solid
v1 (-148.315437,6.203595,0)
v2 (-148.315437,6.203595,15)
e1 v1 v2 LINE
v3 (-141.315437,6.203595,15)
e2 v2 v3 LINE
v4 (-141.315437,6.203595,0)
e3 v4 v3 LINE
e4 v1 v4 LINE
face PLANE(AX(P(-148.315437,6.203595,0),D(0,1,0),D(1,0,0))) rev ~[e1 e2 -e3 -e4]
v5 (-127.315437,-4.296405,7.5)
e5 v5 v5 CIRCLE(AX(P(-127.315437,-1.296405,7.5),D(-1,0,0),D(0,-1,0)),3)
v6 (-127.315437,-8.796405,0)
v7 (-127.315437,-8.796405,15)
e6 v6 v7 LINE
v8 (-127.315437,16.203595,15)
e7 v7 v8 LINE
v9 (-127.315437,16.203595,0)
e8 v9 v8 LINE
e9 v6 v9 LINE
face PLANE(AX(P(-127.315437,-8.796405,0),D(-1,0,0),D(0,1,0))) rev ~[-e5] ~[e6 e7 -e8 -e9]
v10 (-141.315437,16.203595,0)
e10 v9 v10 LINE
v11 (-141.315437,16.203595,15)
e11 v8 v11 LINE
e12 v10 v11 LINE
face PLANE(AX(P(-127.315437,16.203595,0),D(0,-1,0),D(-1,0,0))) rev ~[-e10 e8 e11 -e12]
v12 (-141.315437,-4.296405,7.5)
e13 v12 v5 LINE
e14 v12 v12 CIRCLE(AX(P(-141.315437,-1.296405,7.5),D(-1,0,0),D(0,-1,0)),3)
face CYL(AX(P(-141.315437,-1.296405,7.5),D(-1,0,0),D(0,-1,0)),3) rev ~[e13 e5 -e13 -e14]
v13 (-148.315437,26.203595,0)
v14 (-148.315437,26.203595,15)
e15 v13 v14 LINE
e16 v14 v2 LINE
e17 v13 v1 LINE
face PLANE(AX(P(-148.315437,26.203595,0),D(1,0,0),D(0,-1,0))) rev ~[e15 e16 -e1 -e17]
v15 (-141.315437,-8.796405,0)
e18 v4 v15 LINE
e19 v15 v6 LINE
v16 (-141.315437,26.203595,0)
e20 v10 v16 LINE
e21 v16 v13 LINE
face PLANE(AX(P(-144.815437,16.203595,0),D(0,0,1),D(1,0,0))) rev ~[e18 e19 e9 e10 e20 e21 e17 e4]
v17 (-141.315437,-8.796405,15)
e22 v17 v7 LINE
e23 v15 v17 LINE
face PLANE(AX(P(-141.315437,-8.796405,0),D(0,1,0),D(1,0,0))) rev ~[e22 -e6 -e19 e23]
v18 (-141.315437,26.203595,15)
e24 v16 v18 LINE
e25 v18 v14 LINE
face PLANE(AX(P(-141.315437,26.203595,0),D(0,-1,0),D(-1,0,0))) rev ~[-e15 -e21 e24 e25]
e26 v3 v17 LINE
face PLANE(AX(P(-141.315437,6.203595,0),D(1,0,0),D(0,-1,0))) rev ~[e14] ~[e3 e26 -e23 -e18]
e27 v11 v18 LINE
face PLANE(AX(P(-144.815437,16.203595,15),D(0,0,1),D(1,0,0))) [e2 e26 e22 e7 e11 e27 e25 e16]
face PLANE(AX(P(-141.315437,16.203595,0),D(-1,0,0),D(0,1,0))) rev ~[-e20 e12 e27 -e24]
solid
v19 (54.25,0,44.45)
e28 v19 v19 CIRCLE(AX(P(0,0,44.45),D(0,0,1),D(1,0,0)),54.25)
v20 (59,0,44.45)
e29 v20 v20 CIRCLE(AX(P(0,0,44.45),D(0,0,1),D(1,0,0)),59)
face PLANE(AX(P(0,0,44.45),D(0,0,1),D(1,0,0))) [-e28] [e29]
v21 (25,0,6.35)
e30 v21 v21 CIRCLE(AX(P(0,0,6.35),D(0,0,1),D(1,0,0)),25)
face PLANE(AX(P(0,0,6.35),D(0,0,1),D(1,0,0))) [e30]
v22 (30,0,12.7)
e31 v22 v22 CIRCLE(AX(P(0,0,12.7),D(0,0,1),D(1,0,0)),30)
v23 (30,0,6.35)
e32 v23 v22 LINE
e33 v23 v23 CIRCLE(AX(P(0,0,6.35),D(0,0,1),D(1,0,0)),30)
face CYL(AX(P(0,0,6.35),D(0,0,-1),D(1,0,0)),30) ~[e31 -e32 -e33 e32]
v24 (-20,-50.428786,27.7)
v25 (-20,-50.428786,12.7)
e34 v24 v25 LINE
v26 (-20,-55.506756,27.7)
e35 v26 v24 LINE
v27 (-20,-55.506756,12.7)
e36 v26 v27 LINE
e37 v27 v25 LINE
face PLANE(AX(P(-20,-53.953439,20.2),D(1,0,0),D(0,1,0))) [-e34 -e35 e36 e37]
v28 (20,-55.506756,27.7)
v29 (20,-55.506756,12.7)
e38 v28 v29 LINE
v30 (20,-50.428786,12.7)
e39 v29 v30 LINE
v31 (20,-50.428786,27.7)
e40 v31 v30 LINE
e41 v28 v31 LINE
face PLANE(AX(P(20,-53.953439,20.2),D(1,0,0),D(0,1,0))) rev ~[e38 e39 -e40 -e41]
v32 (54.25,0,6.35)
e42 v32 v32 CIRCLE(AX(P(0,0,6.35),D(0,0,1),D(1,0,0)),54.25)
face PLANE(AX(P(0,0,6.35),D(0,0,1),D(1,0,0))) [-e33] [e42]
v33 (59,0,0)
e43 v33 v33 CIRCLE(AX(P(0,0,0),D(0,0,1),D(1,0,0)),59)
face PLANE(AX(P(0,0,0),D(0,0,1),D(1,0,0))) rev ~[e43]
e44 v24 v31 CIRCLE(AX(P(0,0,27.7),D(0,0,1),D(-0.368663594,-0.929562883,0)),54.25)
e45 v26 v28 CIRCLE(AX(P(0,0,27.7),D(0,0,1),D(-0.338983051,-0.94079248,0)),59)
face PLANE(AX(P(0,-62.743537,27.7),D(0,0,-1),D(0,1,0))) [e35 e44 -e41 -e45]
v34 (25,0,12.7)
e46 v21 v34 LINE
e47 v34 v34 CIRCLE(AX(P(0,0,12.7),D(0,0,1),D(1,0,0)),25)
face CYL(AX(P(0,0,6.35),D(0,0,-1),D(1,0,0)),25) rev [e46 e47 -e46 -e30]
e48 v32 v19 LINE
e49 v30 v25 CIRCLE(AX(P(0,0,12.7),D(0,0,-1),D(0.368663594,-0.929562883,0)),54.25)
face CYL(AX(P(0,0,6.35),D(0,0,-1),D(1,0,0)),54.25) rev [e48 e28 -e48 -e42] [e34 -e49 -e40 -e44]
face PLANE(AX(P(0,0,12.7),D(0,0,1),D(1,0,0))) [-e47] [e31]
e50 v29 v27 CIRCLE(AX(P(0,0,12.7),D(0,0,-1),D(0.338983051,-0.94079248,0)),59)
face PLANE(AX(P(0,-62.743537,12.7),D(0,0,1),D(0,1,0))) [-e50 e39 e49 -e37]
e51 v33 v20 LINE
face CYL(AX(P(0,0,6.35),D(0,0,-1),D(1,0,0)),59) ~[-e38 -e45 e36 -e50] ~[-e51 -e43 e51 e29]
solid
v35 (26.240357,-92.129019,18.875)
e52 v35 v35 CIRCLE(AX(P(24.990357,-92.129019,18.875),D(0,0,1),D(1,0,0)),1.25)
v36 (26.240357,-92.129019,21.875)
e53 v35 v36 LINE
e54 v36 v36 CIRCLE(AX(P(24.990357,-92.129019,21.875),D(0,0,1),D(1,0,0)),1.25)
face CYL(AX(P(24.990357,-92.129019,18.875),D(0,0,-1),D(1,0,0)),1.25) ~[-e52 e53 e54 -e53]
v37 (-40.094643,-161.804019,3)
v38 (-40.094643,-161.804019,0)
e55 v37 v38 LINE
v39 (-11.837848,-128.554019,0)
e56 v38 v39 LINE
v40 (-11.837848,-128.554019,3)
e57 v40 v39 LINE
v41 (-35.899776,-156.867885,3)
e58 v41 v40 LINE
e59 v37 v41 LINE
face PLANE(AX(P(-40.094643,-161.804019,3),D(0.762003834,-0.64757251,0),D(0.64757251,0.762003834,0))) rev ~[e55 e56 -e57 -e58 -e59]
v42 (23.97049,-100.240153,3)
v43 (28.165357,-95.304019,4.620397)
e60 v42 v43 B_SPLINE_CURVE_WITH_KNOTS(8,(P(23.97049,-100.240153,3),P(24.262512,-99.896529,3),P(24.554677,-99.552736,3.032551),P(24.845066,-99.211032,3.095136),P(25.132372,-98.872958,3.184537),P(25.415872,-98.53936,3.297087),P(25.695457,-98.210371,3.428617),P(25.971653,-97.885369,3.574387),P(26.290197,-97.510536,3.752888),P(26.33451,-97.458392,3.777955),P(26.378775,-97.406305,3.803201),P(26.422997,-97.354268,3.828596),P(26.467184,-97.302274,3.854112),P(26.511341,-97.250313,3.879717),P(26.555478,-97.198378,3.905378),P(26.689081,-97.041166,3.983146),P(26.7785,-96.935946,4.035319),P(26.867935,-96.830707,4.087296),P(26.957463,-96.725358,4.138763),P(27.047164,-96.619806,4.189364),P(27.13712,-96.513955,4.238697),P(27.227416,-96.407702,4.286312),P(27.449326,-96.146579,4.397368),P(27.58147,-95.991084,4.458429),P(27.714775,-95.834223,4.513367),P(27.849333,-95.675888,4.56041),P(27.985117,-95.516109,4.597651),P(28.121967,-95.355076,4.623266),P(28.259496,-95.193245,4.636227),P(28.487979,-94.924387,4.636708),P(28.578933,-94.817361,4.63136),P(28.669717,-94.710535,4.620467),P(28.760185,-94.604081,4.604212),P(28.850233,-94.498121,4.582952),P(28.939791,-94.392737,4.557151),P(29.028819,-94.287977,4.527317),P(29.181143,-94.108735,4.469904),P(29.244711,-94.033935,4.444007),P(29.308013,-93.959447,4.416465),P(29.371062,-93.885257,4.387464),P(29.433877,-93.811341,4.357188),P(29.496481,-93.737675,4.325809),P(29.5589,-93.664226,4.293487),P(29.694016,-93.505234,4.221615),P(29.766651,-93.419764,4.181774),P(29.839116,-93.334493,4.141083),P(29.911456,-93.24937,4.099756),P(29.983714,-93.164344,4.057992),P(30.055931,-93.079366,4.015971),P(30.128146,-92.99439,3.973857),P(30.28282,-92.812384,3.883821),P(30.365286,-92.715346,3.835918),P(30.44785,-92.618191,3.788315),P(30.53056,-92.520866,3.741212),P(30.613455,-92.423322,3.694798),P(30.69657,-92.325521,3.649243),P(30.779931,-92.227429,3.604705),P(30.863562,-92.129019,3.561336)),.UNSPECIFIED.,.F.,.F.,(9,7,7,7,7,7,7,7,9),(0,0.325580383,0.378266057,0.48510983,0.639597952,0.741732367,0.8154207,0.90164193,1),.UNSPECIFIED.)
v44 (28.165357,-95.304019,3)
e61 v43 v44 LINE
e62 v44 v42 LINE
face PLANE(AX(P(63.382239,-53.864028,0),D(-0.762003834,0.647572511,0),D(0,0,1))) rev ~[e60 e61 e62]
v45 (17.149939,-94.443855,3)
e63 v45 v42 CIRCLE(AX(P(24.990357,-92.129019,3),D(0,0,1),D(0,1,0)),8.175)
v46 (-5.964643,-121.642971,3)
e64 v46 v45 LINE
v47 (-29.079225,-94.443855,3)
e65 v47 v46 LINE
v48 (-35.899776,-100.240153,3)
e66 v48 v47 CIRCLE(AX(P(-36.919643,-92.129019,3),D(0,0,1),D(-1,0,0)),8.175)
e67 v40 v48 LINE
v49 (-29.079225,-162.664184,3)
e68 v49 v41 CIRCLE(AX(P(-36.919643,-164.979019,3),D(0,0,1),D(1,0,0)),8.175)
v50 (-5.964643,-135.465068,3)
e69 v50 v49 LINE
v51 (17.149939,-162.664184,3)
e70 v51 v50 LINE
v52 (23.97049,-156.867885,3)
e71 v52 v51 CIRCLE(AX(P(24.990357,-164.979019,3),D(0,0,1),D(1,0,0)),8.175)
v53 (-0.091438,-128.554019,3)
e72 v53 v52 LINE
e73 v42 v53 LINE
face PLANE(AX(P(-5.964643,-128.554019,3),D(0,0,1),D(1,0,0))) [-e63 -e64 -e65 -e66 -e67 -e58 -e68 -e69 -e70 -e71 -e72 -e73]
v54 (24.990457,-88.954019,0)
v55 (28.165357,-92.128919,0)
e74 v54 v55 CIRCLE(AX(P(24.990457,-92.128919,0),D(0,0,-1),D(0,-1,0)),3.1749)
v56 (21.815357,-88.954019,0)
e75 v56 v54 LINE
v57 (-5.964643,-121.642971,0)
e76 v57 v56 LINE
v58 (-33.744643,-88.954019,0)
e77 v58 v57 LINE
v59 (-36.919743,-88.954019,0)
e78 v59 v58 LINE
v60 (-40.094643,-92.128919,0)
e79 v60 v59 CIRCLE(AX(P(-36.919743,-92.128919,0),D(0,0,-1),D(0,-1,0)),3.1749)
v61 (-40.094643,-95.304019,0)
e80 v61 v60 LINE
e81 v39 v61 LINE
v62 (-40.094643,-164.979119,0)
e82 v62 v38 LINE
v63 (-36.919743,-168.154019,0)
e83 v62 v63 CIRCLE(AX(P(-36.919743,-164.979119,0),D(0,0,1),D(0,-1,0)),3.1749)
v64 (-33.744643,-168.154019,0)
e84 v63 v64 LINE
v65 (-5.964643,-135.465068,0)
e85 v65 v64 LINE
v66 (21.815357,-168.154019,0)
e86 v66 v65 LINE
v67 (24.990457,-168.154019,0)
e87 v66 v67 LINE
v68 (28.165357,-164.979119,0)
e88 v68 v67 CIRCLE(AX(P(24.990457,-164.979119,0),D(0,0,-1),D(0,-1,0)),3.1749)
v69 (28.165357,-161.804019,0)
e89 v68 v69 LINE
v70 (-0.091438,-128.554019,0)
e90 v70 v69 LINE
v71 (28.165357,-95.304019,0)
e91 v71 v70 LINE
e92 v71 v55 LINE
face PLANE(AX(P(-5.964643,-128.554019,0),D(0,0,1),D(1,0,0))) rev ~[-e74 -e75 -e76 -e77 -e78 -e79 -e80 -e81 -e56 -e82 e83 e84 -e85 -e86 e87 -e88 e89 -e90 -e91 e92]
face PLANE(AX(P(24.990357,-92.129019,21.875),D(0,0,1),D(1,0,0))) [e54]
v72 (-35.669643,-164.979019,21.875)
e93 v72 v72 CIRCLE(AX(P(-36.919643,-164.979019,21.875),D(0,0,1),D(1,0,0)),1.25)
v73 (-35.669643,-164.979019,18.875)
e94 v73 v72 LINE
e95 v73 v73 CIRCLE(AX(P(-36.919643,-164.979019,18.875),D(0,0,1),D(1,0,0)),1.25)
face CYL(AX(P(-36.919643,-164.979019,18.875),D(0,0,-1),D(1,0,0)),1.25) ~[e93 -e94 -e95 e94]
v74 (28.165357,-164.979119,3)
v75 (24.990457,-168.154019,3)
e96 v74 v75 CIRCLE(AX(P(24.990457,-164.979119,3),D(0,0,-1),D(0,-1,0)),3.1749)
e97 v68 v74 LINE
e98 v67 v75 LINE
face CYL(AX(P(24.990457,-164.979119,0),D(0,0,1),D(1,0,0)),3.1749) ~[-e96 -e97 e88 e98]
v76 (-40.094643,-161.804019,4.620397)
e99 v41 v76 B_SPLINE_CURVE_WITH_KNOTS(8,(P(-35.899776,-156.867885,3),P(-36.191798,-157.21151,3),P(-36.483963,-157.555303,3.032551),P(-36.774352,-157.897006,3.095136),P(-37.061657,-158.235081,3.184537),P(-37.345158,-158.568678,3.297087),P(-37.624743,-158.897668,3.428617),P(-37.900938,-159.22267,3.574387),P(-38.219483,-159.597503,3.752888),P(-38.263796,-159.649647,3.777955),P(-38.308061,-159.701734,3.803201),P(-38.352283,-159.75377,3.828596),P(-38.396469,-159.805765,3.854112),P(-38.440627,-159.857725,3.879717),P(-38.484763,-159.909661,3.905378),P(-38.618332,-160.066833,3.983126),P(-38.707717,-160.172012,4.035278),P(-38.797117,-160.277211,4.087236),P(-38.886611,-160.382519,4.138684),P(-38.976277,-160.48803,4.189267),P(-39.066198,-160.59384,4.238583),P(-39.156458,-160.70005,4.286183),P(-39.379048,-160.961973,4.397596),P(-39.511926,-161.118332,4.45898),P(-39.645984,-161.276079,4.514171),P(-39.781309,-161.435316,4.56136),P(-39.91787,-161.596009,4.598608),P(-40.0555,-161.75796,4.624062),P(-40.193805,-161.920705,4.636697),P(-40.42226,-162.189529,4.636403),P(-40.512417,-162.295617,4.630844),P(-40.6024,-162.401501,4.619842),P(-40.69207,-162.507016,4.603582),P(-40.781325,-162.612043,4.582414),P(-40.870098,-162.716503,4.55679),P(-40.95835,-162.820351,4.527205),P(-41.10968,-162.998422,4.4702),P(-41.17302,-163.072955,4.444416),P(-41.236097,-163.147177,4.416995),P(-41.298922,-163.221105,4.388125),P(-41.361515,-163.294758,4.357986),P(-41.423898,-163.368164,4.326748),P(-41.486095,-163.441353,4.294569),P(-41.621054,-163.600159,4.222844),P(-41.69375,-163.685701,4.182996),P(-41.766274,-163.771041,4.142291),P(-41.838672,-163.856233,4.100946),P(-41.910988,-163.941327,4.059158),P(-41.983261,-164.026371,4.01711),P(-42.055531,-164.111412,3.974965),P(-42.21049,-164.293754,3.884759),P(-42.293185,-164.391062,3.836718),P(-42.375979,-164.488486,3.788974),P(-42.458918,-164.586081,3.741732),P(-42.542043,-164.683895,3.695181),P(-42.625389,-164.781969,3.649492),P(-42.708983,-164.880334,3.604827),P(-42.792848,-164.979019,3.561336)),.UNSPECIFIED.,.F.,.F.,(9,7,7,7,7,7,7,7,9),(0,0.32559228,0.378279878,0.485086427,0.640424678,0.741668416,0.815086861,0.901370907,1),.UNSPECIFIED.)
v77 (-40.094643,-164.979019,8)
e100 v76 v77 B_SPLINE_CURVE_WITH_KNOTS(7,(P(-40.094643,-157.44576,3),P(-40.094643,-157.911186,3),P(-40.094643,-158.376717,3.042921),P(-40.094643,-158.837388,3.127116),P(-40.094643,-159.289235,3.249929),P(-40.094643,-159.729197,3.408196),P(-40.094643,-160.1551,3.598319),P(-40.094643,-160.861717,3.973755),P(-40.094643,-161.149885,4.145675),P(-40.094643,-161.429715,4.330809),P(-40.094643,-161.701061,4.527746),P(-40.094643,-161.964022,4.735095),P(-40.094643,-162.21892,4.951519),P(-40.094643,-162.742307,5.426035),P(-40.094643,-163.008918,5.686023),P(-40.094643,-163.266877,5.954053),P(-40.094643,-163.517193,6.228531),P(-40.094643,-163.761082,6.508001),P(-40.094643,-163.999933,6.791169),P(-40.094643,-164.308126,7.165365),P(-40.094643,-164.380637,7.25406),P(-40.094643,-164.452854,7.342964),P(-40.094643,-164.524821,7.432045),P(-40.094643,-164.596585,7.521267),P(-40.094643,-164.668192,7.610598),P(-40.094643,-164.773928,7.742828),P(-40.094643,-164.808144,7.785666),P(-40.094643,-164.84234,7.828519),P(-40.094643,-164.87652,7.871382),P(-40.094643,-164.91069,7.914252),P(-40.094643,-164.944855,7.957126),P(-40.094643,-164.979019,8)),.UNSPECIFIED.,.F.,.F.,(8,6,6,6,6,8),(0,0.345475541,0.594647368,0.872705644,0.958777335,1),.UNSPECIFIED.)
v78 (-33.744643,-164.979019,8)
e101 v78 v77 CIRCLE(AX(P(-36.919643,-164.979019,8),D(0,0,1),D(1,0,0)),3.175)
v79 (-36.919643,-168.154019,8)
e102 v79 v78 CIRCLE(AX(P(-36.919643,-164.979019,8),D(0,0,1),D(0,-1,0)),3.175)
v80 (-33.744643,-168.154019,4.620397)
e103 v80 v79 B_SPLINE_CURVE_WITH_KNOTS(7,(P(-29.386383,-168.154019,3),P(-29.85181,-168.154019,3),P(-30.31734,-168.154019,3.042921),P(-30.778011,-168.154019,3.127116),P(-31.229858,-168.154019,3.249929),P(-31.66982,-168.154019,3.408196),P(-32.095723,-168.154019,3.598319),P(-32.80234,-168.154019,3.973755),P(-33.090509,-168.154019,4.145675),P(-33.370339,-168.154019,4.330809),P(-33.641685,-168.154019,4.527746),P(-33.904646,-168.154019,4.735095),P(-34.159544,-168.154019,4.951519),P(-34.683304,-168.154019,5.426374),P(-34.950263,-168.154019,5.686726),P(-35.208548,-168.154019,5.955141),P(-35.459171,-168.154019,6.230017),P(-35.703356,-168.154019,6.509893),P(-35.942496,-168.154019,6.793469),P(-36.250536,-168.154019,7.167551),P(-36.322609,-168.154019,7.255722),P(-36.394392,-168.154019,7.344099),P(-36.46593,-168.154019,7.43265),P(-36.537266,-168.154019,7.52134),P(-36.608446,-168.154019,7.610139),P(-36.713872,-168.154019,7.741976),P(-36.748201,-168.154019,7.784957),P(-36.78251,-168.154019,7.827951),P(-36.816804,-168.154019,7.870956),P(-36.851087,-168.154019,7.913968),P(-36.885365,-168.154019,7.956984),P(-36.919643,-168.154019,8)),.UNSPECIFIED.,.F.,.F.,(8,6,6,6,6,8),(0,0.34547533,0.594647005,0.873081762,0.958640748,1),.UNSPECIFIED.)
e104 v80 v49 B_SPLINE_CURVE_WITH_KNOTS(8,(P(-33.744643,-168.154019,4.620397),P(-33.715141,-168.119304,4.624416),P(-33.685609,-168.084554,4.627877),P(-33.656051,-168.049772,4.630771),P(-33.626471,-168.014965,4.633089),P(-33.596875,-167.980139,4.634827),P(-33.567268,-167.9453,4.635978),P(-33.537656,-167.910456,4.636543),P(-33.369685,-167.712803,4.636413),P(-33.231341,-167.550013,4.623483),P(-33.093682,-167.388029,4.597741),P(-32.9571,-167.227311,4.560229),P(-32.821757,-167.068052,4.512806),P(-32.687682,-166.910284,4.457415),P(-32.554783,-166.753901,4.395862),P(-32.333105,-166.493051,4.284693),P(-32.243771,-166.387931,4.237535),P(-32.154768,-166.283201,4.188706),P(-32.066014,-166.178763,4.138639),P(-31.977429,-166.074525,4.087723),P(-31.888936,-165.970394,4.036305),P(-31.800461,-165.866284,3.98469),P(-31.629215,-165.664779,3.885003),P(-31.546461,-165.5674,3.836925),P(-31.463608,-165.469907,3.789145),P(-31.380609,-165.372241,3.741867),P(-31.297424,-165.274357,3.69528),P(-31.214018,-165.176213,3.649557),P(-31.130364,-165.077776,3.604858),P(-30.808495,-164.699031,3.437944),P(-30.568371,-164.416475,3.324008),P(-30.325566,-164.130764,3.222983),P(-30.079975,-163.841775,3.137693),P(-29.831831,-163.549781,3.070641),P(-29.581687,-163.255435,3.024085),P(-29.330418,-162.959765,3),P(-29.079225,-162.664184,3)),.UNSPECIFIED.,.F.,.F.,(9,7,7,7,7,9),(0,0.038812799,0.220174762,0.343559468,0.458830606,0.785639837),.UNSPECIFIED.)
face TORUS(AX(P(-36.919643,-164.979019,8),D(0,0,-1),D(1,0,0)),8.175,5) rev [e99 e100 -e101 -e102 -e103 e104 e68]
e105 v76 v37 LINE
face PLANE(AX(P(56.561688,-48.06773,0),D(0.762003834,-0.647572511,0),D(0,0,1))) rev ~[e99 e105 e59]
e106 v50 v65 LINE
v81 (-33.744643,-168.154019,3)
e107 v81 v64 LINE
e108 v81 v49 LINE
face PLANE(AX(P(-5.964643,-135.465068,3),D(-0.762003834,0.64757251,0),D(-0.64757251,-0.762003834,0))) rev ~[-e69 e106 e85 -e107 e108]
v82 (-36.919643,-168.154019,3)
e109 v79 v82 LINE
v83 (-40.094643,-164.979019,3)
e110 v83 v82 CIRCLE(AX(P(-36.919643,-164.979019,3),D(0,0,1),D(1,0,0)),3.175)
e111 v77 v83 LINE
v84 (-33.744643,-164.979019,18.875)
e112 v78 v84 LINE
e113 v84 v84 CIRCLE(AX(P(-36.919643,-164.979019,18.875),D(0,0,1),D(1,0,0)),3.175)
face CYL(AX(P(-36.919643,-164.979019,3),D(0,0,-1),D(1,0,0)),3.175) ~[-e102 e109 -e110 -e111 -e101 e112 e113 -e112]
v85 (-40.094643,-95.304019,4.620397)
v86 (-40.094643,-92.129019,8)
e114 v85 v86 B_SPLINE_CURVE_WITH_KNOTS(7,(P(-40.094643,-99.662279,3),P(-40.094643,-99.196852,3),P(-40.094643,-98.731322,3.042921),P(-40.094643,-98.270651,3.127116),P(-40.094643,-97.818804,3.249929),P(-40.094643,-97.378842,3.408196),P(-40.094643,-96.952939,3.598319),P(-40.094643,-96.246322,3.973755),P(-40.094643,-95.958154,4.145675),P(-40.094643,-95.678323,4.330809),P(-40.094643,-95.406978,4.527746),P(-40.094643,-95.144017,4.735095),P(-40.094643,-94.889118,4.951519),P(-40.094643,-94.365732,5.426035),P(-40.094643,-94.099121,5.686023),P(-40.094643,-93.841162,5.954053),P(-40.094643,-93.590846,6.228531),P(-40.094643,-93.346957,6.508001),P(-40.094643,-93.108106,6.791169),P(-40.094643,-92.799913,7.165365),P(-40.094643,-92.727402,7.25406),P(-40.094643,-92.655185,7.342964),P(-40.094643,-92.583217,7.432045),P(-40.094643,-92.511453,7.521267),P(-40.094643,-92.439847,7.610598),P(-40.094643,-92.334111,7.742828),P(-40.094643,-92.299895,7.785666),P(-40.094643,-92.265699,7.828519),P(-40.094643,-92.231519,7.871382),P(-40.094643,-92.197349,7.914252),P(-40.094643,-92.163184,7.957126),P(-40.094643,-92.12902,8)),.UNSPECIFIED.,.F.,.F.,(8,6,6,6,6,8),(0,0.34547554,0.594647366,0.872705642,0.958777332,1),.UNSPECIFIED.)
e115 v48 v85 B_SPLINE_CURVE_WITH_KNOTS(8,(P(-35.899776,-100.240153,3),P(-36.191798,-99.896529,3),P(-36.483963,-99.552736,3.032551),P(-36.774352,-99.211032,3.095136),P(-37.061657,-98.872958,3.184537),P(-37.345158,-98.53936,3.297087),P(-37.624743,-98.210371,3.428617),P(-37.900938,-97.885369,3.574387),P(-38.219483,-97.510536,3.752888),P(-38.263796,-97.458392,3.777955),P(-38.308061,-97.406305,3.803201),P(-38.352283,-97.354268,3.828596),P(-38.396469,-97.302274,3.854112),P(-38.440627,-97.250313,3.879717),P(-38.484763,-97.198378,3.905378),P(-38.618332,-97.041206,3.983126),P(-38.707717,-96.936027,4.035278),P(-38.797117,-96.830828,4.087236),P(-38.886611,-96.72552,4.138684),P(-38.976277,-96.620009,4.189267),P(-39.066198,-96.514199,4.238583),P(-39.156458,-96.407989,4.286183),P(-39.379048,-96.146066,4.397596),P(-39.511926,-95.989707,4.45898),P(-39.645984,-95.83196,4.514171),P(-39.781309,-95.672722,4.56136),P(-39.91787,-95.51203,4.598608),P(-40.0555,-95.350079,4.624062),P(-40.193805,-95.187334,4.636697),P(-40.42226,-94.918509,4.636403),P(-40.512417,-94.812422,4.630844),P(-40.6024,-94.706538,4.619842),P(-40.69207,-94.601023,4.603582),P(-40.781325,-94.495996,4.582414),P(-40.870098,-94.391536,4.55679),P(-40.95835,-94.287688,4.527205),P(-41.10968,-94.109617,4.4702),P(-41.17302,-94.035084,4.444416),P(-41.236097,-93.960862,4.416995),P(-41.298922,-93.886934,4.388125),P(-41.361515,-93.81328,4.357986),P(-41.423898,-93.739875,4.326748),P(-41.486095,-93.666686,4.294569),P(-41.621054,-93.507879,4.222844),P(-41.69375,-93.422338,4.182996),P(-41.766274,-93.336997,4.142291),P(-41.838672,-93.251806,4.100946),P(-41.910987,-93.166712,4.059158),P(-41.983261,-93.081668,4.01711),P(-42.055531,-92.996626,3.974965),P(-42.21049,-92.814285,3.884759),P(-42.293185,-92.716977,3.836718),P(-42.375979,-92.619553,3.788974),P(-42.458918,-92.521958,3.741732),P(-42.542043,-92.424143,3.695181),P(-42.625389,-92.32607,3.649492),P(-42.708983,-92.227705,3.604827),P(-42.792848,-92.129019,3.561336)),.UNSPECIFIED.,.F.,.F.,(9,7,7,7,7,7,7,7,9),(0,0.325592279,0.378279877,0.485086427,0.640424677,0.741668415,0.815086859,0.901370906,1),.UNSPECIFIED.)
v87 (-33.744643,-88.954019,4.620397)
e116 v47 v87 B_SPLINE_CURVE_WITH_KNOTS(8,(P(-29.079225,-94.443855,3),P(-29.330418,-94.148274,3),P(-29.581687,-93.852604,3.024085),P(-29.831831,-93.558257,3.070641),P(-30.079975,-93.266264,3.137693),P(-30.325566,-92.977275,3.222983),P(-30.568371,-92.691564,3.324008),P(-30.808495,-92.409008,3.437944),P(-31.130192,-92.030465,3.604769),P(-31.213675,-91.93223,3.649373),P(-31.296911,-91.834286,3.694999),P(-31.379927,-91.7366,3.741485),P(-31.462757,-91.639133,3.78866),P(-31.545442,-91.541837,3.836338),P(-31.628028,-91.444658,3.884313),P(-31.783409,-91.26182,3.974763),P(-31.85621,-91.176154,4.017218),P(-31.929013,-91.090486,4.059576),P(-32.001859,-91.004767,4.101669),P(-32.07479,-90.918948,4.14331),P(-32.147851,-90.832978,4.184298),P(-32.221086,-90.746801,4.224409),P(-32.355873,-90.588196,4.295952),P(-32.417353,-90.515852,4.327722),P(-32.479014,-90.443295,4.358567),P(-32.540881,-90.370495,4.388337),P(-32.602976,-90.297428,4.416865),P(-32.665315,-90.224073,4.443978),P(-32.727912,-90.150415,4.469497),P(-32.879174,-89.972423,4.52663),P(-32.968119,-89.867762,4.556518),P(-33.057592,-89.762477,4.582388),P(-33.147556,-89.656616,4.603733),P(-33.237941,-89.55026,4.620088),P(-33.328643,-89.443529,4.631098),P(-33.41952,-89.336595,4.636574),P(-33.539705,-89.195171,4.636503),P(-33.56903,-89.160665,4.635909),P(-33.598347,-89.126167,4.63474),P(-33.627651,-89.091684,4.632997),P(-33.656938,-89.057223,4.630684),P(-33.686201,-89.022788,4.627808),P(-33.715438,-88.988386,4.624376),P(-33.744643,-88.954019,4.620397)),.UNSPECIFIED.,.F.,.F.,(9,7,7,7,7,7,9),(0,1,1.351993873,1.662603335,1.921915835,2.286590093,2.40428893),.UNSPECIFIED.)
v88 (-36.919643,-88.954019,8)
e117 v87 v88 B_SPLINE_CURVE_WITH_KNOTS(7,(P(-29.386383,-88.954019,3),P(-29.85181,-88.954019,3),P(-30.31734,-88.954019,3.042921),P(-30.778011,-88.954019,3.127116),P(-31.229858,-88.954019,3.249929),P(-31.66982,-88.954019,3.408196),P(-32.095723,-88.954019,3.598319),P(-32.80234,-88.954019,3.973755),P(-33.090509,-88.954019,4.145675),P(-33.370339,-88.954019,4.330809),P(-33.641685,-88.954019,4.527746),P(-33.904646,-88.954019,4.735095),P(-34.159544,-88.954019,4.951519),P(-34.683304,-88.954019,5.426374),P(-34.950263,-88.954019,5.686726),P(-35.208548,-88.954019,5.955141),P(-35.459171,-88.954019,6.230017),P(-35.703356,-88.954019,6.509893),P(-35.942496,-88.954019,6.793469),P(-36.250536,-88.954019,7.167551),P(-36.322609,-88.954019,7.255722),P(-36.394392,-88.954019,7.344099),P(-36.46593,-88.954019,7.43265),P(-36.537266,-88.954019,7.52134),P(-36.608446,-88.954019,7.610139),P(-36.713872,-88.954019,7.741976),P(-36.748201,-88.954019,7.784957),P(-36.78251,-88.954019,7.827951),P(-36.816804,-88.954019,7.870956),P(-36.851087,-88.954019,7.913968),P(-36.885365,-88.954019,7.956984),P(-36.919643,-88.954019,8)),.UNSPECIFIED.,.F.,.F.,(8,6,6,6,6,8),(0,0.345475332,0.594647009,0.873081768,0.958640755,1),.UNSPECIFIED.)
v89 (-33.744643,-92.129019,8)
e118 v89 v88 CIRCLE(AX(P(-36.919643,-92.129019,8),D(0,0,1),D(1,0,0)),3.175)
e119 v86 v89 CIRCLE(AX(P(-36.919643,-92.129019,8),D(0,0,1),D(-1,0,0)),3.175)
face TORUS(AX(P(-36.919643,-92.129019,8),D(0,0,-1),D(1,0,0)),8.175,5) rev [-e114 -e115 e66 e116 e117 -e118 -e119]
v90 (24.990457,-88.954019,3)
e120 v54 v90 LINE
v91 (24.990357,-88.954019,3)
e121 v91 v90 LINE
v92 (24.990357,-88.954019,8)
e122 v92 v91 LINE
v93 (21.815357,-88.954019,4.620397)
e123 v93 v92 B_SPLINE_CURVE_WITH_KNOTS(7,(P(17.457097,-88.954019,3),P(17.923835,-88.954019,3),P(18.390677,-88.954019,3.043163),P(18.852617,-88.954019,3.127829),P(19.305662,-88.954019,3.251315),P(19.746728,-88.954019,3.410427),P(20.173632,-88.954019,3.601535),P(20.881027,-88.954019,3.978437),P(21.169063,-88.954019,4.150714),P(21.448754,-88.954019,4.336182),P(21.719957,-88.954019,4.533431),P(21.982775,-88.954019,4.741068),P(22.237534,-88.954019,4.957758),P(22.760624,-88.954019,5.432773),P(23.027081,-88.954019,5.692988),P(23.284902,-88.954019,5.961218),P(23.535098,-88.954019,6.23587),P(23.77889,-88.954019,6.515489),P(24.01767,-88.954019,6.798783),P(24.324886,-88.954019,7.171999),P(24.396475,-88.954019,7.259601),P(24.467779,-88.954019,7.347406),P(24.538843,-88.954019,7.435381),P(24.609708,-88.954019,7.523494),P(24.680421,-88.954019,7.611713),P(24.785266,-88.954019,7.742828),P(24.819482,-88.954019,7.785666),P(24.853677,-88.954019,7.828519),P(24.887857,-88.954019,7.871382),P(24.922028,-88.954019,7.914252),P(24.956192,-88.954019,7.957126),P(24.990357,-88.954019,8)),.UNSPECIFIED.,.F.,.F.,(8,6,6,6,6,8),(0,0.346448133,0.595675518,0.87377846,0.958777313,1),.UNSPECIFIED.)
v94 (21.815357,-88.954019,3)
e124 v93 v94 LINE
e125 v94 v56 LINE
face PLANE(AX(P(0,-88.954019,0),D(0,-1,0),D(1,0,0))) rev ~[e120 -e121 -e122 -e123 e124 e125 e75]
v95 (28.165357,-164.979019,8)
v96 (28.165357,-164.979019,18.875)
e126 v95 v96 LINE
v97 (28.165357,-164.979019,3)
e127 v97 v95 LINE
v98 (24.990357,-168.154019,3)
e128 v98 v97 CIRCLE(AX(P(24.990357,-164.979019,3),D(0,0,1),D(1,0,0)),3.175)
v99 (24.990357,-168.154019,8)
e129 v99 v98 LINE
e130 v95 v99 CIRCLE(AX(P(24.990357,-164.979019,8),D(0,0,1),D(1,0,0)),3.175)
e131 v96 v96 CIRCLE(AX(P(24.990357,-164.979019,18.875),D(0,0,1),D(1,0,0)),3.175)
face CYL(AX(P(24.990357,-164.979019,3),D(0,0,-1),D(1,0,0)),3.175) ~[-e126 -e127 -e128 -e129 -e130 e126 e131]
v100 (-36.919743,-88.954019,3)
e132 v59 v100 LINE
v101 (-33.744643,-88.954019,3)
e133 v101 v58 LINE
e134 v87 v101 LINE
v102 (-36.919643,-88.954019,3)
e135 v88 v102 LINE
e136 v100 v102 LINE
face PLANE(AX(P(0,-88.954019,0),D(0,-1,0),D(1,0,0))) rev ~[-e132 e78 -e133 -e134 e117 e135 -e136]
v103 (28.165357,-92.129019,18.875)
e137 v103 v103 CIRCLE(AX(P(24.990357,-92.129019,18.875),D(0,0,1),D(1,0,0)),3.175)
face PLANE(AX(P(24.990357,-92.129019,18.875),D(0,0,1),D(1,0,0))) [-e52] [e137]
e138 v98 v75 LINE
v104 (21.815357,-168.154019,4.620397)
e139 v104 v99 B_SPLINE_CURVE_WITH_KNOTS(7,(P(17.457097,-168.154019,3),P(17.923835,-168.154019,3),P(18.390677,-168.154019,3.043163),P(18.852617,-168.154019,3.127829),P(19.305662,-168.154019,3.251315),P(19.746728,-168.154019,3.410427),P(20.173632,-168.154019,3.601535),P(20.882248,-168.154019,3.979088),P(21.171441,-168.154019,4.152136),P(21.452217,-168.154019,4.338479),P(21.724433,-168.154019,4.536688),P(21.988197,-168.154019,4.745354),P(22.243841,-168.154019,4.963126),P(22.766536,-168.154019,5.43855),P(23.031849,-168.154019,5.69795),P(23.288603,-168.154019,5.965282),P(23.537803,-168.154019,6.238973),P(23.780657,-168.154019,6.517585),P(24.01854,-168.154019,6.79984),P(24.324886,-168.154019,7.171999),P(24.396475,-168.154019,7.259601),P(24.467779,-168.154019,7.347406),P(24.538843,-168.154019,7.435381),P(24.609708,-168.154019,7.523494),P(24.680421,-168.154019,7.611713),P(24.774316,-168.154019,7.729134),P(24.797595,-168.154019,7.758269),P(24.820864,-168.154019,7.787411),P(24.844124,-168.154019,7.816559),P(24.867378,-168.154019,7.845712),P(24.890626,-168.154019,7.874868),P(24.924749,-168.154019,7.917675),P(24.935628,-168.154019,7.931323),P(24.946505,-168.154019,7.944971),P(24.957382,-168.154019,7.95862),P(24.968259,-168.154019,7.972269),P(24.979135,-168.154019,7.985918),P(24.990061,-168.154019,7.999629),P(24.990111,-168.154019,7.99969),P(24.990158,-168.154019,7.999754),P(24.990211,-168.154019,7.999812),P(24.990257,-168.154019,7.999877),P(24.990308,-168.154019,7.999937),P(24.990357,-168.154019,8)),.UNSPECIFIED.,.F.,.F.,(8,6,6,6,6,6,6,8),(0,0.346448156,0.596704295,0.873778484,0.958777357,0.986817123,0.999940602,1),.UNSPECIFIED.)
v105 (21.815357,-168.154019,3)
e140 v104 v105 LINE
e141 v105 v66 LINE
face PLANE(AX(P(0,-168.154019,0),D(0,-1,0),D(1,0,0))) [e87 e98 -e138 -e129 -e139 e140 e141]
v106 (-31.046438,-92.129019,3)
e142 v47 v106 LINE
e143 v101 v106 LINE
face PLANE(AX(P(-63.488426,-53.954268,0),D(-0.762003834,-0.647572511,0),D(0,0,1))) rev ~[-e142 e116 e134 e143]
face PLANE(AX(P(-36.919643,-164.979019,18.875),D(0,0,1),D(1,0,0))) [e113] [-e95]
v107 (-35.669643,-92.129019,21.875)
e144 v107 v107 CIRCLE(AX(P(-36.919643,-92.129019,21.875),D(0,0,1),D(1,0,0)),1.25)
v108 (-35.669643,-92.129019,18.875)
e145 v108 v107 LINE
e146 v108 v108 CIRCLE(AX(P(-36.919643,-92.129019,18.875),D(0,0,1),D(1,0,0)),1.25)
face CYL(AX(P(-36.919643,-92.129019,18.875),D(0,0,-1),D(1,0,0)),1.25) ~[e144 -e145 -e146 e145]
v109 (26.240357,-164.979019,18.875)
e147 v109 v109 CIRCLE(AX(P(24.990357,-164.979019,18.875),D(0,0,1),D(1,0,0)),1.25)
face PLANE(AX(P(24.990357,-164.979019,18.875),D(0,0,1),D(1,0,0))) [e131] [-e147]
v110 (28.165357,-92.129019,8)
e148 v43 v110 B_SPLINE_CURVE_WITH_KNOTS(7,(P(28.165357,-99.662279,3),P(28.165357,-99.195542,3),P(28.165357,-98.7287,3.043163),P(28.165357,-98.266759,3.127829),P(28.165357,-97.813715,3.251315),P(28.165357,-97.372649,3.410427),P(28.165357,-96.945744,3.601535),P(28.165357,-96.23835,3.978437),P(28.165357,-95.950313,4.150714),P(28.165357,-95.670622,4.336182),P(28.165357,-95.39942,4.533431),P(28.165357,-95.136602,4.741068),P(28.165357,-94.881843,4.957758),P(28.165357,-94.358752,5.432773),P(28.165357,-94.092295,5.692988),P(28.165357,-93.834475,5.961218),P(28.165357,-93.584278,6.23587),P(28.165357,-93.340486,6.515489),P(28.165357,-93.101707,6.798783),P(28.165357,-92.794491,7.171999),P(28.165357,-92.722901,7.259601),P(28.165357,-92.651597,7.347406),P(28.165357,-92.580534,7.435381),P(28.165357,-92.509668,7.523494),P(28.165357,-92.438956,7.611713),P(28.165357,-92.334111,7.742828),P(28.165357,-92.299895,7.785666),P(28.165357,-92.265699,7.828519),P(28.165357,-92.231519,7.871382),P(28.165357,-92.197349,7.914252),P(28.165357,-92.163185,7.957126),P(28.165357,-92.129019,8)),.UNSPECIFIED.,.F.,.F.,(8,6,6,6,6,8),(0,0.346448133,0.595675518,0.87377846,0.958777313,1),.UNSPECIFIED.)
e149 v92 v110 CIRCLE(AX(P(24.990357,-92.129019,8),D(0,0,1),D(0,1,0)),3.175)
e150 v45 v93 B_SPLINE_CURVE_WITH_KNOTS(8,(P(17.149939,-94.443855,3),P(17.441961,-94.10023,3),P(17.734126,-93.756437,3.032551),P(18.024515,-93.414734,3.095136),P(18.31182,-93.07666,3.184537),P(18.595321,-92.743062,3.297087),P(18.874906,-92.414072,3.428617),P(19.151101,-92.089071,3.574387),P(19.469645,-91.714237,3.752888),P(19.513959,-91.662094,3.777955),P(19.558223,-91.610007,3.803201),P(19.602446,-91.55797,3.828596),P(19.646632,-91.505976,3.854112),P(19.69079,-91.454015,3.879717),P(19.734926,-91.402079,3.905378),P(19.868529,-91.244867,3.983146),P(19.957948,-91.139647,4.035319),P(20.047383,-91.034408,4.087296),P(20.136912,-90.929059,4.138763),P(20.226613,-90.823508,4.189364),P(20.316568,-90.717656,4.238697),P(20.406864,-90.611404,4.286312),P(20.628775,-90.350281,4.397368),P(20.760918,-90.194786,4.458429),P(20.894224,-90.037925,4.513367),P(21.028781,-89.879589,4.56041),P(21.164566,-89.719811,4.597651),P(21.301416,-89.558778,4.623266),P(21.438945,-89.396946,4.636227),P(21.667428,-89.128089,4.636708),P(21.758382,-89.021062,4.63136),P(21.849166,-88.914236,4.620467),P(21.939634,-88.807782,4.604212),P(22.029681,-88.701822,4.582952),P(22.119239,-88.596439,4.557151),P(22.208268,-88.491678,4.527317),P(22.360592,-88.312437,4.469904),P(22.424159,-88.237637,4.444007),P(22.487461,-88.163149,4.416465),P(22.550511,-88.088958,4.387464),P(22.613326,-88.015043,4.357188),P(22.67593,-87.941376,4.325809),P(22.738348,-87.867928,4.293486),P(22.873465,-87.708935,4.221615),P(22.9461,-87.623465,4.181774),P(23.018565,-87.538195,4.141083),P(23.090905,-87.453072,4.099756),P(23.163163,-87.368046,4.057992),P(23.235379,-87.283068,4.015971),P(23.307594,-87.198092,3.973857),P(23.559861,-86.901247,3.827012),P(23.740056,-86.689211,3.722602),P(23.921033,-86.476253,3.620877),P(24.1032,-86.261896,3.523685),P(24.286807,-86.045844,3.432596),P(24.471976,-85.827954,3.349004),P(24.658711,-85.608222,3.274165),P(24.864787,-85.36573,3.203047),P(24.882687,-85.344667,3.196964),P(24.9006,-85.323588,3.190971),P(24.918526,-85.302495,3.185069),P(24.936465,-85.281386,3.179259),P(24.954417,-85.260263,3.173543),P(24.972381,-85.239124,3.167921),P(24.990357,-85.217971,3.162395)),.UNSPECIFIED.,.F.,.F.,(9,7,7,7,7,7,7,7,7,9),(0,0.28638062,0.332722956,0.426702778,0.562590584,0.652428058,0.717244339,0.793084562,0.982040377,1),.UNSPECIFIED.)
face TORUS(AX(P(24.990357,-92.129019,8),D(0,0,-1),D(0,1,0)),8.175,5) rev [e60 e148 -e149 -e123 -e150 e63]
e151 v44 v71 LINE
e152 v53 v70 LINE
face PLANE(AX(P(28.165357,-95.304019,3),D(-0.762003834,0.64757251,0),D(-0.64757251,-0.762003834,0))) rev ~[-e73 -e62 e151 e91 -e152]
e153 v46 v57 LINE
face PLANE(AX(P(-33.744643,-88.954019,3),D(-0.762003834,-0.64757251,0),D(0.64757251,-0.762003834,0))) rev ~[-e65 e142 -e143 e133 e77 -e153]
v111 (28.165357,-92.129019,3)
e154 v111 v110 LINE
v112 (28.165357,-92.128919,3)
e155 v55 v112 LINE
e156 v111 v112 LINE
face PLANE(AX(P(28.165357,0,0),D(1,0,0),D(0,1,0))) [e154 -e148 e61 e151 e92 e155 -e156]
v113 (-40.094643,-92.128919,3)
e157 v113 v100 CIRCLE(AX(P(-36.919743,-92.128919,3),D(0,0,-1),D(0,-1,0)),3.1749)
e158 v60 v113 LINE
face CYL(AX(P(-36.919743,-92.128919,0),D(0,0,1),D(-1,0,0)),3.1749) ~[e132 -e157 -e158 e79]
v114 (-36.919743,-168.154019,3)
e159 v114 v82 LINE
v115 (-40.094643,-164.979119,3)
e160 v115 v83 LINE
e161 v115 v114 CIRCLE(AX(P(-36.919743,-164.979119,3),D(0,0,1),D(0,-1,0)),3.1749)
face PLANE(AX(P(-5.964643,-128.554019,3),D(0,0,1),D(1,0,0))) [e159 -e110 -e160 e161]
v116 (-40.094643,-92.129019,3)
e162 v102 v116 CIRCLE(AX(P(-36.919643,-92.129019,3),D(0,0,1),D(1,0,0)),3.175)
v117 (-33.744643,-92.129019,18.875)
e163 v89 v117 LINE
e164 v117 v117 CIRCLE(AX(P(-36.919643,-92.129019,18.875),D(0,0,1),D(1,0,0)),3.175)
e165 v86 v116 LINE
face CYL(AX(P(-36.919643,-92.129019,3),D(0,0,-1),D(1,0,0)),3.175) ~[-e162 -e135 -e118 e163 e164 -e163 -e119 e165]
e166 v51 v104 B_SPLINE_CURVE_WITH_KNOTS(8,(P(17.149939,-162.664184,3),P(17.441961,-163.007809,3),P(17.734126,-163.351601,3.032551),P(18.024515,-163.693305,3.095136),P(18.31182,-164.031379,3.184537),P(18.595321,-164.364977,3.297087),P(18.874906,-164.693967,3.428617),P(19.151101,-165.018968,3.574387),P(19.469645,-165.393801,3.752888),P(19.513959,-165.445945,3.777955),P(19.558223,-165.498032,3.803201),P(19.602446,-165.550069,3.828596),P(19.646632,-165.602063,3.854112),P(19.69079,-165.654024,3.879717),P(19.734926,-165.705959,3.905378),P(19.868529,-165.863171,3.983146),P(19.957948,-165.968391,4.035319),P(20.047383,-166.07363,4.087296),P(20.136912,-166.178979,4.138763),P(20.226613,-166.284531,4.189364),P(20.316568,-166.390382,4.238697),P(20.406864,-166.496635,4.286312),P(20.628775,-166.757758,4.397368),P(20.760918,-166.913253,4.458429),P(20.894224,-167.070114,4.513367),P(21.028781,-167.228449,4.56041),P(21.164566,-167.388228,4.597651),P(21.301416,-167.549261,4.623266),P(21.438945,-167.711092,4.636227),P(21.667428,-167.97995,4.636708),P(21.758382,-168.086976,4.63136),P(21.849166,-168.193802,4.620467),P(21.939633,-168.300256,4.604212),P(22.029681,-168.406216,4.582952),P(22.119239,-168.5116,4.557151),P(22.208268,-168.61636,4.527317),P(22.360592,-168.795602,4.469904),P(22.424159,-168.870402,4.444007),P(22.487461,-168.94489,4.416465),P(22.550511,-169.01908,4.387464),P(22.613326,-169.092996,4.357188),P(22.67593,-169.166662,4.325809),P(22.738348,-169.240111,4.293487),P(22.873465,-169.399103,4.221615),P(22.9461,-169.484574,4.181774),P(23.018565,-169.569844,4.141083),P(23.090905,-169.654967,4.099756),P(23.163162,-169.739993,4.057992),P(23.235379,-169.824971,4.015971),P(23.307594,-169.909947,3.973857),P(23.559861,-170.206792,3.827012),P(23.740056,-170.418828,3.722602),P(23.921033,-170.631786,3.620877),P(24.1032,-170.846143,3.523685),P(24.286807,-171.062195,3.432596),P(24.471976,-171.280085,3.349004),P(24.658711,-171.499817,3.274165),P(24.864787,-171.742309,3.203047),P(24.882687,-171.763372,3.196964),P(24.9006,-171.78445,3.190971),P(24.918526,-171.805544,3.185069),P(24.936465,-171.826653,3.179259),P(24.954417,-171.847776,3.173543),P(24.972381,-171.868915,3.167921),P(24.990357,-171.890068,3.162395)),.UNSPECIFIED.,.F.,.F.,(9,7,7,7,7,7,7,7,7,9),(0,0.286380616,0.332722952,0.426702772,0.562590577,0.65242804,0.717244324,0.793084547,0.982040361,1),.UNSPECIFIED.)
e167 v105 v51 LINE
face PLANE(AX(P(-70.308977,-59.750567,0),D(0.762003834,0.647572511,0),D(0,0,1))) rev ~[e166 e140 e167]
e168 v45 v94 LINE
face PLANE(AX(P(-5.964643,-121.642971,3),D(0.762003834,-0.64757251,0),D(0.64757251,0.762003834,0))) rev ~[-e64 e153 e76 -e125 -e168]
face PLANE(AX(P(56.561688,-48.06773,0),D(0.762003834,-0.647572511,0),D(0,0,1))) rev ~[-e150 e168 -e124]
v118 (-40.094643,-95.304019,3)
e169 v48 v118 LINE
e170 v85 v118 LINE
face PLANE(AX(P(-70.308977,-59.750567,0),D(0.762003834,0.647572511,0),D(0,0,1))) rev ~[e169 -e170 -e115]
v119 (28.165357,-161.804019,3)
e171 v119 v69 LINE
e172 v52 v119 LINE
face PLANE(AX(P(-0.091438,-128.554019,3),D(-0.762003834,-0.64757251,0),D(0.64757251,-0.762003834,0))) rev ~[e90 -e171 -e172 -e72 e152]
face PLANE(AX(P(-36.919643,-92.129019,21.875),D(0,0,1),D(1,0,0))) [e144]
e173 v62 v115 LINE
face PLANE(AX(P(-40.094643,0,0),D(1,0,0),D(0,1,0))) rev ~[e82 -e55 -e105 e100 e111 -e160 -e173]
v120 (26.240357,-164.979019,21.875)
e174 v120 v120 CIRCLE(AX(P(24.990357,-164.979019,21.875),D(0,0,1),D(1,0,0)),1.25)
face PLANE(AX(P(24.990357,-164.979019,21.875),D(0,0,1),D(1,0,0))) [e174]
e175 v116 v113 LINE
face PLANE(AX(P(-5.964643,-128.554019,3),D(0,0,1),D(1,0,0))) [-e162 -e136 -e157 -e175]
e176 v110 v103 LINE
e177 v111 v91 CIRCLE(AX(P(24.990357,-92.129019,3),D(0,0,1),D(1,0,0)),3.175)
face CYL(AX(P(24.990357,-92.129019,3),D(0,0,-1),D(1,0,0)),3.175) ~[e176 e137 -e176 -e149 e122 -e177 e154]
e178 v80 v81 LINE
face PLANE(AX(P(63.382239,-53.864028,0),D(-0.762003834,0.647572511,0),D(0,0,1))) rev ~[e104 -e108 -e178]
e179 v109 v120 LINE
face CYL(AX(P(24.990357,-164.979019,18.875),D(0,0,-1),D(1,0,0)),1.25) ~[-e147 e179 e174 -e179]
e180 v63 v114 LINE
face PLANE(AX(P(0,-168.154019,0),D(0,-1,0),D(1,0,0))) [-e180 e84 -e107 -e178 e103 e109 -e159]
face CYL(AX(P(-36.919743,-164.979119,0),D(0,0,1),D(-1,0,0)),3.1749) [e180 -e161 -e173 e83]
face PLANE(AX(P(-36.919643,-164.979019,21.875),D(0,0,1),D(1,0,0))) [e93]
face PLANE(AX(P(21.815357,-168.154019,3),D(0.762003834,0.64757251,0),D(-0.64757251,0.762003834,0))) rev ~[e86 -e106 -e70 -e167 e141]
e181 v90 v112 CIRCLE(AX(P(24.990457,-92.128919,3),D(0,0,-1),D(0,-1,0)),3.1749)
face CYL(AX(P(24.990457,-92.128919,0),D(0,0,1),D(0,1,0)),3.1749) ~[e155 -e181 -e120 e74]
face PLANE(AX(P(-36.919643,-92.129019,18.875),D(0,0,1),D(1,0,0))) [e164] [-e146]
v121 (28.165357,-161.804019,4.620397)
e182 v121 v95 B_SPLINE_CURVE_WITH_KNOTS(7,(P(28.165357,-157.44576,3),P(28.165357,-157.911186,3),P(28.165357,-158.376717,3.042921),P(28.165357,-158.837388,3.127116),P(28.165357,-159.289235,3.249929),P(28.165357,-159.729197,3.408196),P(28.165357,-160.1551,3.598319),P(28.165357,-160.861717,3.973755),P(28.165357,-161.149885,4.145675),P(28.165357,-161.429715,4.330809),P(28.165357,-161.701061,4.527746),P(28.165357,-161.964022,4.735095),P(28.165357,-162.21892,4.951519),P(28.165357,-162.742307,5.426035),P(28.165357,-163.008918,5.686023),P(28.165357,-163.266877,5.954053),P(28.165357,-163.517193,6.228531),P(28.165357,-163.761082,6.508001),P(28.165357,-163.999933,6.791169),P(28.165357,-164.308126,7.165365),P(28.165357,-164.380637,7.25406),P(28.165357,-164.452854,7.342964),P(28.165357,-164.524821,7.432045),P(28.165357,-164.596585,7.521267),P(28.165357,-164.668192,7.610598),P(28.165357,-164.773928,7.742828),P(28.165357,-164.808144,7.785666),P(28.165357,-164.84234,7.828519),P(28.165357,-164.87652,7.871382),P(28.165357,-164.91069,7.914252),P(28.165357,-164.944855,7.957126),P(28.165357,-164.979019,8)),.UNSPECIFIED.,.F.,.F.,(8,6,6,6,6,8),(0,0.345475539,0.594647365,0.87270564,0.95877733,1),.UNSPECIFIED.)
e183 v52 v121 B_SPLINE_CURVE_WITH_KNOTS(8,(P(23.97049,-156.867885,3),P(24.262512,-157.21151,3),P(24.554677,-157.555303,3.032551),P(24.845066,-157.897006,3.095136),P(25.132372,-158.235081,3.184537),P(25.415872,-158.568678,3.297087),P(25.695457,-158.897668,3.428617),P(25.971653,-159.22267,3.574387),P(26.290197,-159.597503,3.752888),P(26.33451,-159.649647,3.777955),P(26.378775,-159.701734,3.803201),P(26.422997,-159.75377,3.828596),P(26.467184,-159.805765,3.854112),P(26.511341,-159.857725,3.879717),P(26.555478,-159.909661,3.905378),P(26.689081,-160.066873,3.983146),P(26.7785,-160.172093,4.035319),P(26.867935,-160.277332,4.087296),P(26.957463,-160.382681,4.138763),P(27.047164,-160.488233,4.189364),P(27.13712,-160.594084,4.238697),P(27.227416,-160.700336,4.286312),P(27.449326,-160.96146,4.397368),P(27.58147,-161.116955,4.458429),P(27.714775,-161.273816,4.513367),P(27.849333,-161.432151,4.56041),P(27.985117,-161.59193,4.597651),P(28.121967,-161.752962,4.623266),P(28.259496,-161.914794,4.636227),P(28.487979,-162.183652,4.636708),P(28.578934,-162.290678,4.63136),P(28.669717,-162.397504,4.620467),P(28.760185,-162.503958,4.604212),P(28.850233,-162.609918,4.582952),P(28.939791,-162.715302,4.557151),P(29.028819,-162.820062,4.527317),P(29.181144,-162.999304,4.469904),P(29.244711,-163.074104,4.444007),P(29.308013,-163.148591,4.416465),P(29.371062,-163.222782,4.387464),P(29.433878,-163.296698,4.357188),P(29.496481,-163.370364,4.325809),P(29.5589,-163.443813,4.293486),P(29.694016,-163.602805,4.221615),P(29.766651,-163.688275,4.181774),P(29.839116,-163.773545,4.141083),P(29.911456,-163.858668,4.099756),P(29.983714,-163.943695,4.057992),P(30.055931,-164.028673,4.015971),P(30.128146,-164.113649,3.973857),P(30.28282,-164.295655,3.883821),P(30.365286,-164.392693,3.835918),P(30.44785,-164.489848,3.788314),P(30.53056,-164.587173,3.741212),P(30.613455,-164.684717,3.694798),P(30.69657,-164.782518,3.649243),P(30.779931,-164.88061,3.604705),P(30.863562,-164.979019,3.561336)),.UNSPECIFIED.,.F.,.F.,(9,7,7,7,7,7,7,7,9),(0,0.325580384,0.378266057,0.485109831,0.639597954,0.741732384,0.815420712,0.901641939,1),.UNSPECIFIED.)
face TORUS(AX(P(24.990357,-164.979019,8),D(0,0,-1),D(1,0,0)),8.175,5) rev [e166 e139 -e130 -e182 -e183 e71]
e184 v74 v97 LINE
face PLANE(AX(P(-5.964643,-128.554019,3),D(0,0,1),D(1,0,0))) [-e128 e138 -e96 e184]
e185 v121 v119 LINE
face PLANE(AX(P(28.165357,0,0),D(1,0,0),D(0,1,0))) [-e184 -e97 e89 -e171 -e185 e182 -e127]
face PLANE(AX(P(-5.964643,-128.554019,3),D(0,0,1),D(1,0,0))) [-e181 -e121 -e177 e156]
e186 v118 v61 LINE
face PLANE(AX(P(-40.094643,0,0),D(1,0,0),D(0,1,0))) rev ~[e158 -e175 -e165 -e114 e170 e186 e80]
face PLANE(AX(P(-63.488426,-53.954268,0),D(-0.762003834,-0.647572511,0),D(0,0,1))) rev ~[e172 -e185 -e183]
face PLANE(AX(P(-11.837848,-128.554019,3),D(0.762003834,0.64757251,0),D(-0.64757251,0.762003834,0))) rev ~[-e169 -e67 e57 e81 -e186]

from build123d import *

# Parameters (mm, degrees)
F0_R          = 59
F1_DEPTH      = 6.35
F2_R          = 59
F2_R_2        = 54.25
F3_DEPTH      = 38.1
F4_R          = 30
F4_R_2        = 25
F5_DEPTH      = 6.35
F6_W          = 17.5801962614
F6_H          = 15
F7_DEPTH      = 20
F7_DEPTH_BACK = 20
F8_W          = 68.26
F8_H          = 79.2
F9_DEPTH      = 3
F11_DEPTH     = 25
F12_R         = 3.175
F13_DEPTH     = 15.875
F14_R         = 3.1749
F15_R         = 1.25
F16_DEPTH     = 3
F17_T4_ANGLE  = 270.0000007364
F17_T12_ANGLE = 90
F17_T18_ANGLE = 180
F17_T25_ANGLE = 270
F17_T33_ANGLE = 180
F17_T40_ANGLE = 90
F19_DEPTH     = 15
F20_R         = 3
F21_DEPTH     = 25


# Not quite as in the source:
# - a fillet or chamfer that OpenCascade refuses, or shapes differently, is made with other operations: its cross-section is extruded or revolved along the edge and cut away or added
# - a fillet or chamfer is up to 0.001 mm smaller than in the source, because OpenCascade refuses the exact size


with BuildPart() as f1:
    # F0 (on Top) → F1 (new body)
    with BuildSketch(Plane.XY):
        Circle(F0_R)
    extrude(amount=F1_DEPTH)

    # F2 (on face) → F3 (join)
    with BuildSketch(Plane.XY.offset(6.35)):
        Circle(F2_R)
        Circle(F2_R_2, mode=Mode.SUBTRACT)
    extrude(amount=F3_DEPTH)

    # F4 (on face) → F5 (join)
    with BuildSketch(Plane.XY.offset(6.35)):
        Circle(F4_R)
        Circle(F4_R_2, mode=Mode.SUBTRACT)
    extrude(amount=F5_DEPTH)

    # F6 (on Right) → F7 (cut, two sides)
    with BuildSketch(Plane.YZ) as f7_sk:
        with Locations((-53.9534389973, 20.2)):
            Rectangle(F6_W, F6_H)
    extrude(amount=F7_DEPTH, mode=Mode.SUBTRACT)
    extrude(f7_sk.sketch, amount=-F7_DEPTH_BACK, mode=Mode.SUBTRACT)


with BuildPart() as f9:
    # F8 (on Top) → F9 (new body)
    with BuildSketch(Plane.XY):
        with Locations((-5.9646429376, -128.5540193915)):
            Rectangle(F8_W, F8_H)
    extrude(amount=F9_DEPTH)

    # F10 (on face) → F11 (cut)
    with BuildSketch(Plane.XY.offset(3)):
        Polygon((-0.0914377214, -128.5540193915), (28.1653570624, -161.8040193915), (28.1653570624, -95.3040193915), align=None)
        Polygon((-33.7446429376, -88.9540193915), (-5.9646429376, -121.6429710956), (21.8153570624, -88.9540193915), align=None)
        Polygon((-33.7446429376, -168.1540193915), (21.8153570624, -168.1540193915), (-5.9646429376, -135.4650676875), align=None)
        Polygon((-40.0946429376, -161.8040193915), (-11.8378481538, -128.5540193915), (-40.0946429376, -95.3040193915), align=None)
    extrude(amount=-F11_DEPTH, mode=Mode.SUBTRACT)

    # F12 (on face) → F13 (join)
    with BuildSketch(Plane.XY.offset(3)):
        with Locations((-36.9196429376, -92.1290193915)):
            Circle(F12_R)
        with Locations((24.9903570624, -92.1290193915)):
            Circle(F12_R)
        with Locations((24.9903570624, -164.9790193915)):
            Circle(F12_R)
        with Locations((-36.9196429376, -164.9790193915)):
            Circle(F12_R)
    extrude(amount=F13_DEPTH)

    # F14 (radius 3.175 in the source; OpenCascade refuses exactly that, so slightly less here)
    f14_edges = [f9.edges().sort_by_distance(p)[0] for p in [
        (-40.094643, -168.154019, 1.5),
        (28.165357, -168.154019, 1.5),
        (28.165357, -88.954019, 1.5),
        (-40.094643, -88.954019, 1.5),
    ]]
    fillet(f14_edges, radius=F14_R)

    # F15 (on face) → F16 (join)
    with BuildSketch(Plane.XY.offset(18.875)):
        with Locations((24.9903570624, -164.9790193915)):
            Circle(F15_R)
        with Locations((24.9903570624, -92.1290193915)):
            Circle(F15_R)
        with Locations((-36.9196429376, -92.1290193915)):
            Circle(F15_R)
        with Locations((-36.9196429376, -164.9790193915)):
            Circle(F15_R)
    extrude(amount=F16_DEPTH)

    # F17: fillet of radius 5 on 6 edges, made by hand


with BuildPart() as f17_tool2:
    # F17_s3 → F17_t4 (revolve)
    with BuildSketch(Plane.XZ.offset(164.9790193915)):
        with BuildLine():
            ThreePointArc((33.1653570624, 3), (29.6298231565, 4.4644660941), (28.1653570624, 8))
            Line((28.1653570624, 8), (28.1653570624, 3))
            Line((28.1653570624, 3), (33.1653570624, 3))
        make_face()
    revolve(axis=Axis((24.9903570624, -164.9790193915, 3), (0, 0, 1)), revolution_arc=F17_T4_ANGLE)

    split(bisect_by=Plane(origin=(-70.308977279, -59.7505666897, 0), x_dir=(0, 0, 1), z_dir=(0.7620038344, 0.6475725105, 0)), keep=Keep.TOP)

    split(bisect_by=Plane.XZ.offset(168.1540193915), keep=Keep.BOTTOM)

    split(bisect_by=Plane.YZ.offset(28.1653570624), keep=Keep.BOTTOM)

    split(bisect_by=Plane(origin=(-63.4884258978, -53.954268323, 0), x_dir=(0, 0, 1), z_dir=(-0.7620038344, -0.6475725105, 0)), keep=Keep.TOP)


with BuildPart() as f9_1:
    add(f9.part)

    # F17_t1: union F17_tool2
    add(f17_tool2.part)


with BuildPart() as f17_tool10:
    # F17_s11 → F17_t12 (revolve)
    with BuildSketch(Plane.YZ.offset(-36.9196429376)):
        with BuildLine():
            ThreePointArc((-173.1540193915, 3), (-169.6184854856, 4.4644660941), (-168.1540193915, 8))
            Line((-168.1540193915, 8), (-168.1540193915, 3))
            Line((-168.1540193915, 3), (-173.1540193915, 3))
        make_face()
    revolve(axis=Axis((-36.9196429376, -164.9790193915, 3), (0, 0, 1)), revolution_arc=F17_T12_ANGLE)

    split(bisect_by=Plane.XZ.offset(168.1540193915), keep=Keep.BOTTOM)

    split(bisect_by=Plane(origin=(63.3822393005, -53.8640279354, 0), x_dir=(0, 0, 1), z_dir=(-0.7620038344, 0.6475725105, 0)), keep=Keep.TOP)


with BuildPart() as f9_2:
    add(f9_1.part)

    # F17_t9: union F17_tool10
    add(f17_tool10.part)


with BuildPart() as f17_tool16:
    # F17_s17 → F17_t18 (revolve)
    with BuildSketch(Plane.XZ.offset(164.9790193915)):
        with BuildLine():
            ThreePointArc((-28.7446429376, 3), (-32.2801768435, 4.4644660941), (-33.7446429376, 8))
            Line((-33.7446429376, 8), (-33.7446429376, 3))
            Line((-33.7446429376, 3), (-28.7446429376, 3))
        make_face()
    revolve(axis=Axis((-36.9196429376, -164.9790193915, 3), (0, 0, 1)), revolution_arc=F17_T18_ANGLE)

    split(bisect_by=Plane(origin=(63.3822393005, -53.8640279354, 0), x_dir=(0, 0, 1), z_dir=(-0.7620038344, 0.6475725105, 0)), keep=Keep.TOP)

    split(bisect_by=Plane.YZ.offset(-40.0946429376), keep=Keep.TOP)

    split(bisect_by=Plane(origin=(56.5616879193, -48.0677295688, 0), x_dir=(0, 0, 1), z_dir=(0.7620038344, -0.6475725105, 0)), keep=Keep.TOP)


with BuildPart() as f9_3:
    add(f9_2.part)

    # F17_t15: union F17_tool16
    add(f17_tool16.part)


with BuildPart() as f17_tool23:
    # F17_s24 → F17_t25 (revolve)
    with BuildSketch(Plane.YZ.offset(24.9903570624)):
        with BuildLine():
            ThreePointArc((-83.9540193915, 3), (-87.4895532975, 4.4644660941), (-88.9540193915, 8))
            Line((-88.9540193915, 8), (-88.9540193915, 3))
            Line((-88.9540193915, 3), (-83.9540193915, 3))
        make_face()
    revolve(axis=Axis((24.9903570624, -92.1290193915, 3), (0, 0, 1)), revolution_arc=F17_T25_ANGLE)

    split(bisect_by=Plane(origin=(56.5616879193, -48.0677295688, 0), x_dir=(0, 0, 1), z_dir=(0.7620038344, -0.6475725105, 0)), keep=Keep.TOP)

    split(bisect_by=Plane.XZ.offset(88.9540193915), keep=Keep.TOP)

    split(bisect_by=Plane(origin=(63.3822393005, -53.8640279354, 0), x_dir=(0, 0, 1), z_dir=(-0.7620038344, 0.6475725105, 0)), keep=Keep.TOP)

    split(bisect_by=Plane.YZ.offset(28.1653570624), keep=Keep.BOTTOM)


with BuildPart() as f9_4:
    add(f9_3.part)

    # F17_t22: union F17_tool23
    add(f17_tool23.part)


with BuildPart() as f17_tool31:
    # F17_s32 → F17_t33 (revolve)
    with BuildSketch(Plane.XZ.offset(92.1290193915)):
        with BuildLine():
            ThreePointArc((-45.0946429376, 3), (-41.5591090317, 4.4644660941), (-40.0946429376, 8))
            Line((-40.0946429376, 8), (-40.0946429376, 3))
            Line((-40.0946429376, 3), (-45.0946429376, 3))
        make_face()
    revolve(axis=Axis((-36.9196429376, -92.1290193915, 3), (0, 0, 1)), revolution_arc=F17_T33_ANGLE)

    split(bisect_by=Plane(origin=(-70.308977279, -59.7505666897, 0), x_dir=(0, 0, 1), z_dir=(0.7620038344, 0.6475725105, 0)), keep=Keep.TOP)

    split(bisect_by=Plane.YZ.offset(-40.0946429376), keep=Keep.TOP)

    split(bisect_by=Plane(origin=(-63.4884258978, -53.954268323, 0), x_dir=(0, 0, 1), z_dir=(-0.7620038344, -0.6475725105, 0)), keep=Keep.TOP)


with BuildPart() as f9_5:
    add(f9_4.part)

    # F17_t30: union F17_tool31
    add(f17_tool31.part)


with BuildPart() as f17_tool38:
    # F17_s39 → F17_t40 (revolve)
    with BuildSketch(Plane.XZ.offset(92.1290193915)):
        with BuildLine():
            ThreePointArc((-28.7446429376, 3), (-32.2801768435, 4.4644660941), (-33.7446429376, 8))
            Line((-33.7446429376, 8), (-33.7446429376, 3))
            Line((-33.7446429376, 3), (-28.7446429376, 3))
        make_face()
    revolve(axis=Axis((-36.9196429376, -92.1290193915, 3), (0, 0, 1)), revolution_arc=F17_T40_ANGLE)

    split(bisect_by=Plane.XZ.offset(88.9540193915), keep=Keep.TOP)

    split(bisect_by=Plane(origin=(-63.4884258978, -53.954268323, 0), x_dir=(0, 0, 1), z_dir=(-0.7620038344, -0.6475725105, 0)), keep=Keep.TOP)


with BuildPart() as f9_6:
    add(f9_5.part)

    # F17_t37: union F17_tool38
    add(f17_tool38.part)


with BuildPart() as f19:
    # F18 (on Top) → F19 (new body)
    with BuildSketch(Plane.XY):
        Polygon((-141.315436988, 26.2035948246), (-148.315436988, 26.2035948246), (-148.315436988, 6.2035948246), (-141.315436988, 6.2035948246), (-141.315436988, 16.2035948246), align=None)
        Polygon((-127.315436988, 16.2035948246), (-141.315436988, 16.2035948246), (-141.315436988, 6.2035948246), (-141.315436988, -8.7964051754), (-127.315436988, -8.7964051754), align=None)
    extrude(amount=F19_DEPTH)

    # F20 (on face) → F21 (cut)
    with BuildSketch(Plane(origin=(-141.315436988, 0, 0), x_dir=(0, -1, 0), z_dir=(-1, 0, 0))):
        with Locations((1.2964051754, 7.5)):
            Circle(F20_R)
    extrude(amount=-F21_DEPTH, mode=Mode.SUBTRACT)


solid = Compound([f1.part, f9_6.part, f19.part])
